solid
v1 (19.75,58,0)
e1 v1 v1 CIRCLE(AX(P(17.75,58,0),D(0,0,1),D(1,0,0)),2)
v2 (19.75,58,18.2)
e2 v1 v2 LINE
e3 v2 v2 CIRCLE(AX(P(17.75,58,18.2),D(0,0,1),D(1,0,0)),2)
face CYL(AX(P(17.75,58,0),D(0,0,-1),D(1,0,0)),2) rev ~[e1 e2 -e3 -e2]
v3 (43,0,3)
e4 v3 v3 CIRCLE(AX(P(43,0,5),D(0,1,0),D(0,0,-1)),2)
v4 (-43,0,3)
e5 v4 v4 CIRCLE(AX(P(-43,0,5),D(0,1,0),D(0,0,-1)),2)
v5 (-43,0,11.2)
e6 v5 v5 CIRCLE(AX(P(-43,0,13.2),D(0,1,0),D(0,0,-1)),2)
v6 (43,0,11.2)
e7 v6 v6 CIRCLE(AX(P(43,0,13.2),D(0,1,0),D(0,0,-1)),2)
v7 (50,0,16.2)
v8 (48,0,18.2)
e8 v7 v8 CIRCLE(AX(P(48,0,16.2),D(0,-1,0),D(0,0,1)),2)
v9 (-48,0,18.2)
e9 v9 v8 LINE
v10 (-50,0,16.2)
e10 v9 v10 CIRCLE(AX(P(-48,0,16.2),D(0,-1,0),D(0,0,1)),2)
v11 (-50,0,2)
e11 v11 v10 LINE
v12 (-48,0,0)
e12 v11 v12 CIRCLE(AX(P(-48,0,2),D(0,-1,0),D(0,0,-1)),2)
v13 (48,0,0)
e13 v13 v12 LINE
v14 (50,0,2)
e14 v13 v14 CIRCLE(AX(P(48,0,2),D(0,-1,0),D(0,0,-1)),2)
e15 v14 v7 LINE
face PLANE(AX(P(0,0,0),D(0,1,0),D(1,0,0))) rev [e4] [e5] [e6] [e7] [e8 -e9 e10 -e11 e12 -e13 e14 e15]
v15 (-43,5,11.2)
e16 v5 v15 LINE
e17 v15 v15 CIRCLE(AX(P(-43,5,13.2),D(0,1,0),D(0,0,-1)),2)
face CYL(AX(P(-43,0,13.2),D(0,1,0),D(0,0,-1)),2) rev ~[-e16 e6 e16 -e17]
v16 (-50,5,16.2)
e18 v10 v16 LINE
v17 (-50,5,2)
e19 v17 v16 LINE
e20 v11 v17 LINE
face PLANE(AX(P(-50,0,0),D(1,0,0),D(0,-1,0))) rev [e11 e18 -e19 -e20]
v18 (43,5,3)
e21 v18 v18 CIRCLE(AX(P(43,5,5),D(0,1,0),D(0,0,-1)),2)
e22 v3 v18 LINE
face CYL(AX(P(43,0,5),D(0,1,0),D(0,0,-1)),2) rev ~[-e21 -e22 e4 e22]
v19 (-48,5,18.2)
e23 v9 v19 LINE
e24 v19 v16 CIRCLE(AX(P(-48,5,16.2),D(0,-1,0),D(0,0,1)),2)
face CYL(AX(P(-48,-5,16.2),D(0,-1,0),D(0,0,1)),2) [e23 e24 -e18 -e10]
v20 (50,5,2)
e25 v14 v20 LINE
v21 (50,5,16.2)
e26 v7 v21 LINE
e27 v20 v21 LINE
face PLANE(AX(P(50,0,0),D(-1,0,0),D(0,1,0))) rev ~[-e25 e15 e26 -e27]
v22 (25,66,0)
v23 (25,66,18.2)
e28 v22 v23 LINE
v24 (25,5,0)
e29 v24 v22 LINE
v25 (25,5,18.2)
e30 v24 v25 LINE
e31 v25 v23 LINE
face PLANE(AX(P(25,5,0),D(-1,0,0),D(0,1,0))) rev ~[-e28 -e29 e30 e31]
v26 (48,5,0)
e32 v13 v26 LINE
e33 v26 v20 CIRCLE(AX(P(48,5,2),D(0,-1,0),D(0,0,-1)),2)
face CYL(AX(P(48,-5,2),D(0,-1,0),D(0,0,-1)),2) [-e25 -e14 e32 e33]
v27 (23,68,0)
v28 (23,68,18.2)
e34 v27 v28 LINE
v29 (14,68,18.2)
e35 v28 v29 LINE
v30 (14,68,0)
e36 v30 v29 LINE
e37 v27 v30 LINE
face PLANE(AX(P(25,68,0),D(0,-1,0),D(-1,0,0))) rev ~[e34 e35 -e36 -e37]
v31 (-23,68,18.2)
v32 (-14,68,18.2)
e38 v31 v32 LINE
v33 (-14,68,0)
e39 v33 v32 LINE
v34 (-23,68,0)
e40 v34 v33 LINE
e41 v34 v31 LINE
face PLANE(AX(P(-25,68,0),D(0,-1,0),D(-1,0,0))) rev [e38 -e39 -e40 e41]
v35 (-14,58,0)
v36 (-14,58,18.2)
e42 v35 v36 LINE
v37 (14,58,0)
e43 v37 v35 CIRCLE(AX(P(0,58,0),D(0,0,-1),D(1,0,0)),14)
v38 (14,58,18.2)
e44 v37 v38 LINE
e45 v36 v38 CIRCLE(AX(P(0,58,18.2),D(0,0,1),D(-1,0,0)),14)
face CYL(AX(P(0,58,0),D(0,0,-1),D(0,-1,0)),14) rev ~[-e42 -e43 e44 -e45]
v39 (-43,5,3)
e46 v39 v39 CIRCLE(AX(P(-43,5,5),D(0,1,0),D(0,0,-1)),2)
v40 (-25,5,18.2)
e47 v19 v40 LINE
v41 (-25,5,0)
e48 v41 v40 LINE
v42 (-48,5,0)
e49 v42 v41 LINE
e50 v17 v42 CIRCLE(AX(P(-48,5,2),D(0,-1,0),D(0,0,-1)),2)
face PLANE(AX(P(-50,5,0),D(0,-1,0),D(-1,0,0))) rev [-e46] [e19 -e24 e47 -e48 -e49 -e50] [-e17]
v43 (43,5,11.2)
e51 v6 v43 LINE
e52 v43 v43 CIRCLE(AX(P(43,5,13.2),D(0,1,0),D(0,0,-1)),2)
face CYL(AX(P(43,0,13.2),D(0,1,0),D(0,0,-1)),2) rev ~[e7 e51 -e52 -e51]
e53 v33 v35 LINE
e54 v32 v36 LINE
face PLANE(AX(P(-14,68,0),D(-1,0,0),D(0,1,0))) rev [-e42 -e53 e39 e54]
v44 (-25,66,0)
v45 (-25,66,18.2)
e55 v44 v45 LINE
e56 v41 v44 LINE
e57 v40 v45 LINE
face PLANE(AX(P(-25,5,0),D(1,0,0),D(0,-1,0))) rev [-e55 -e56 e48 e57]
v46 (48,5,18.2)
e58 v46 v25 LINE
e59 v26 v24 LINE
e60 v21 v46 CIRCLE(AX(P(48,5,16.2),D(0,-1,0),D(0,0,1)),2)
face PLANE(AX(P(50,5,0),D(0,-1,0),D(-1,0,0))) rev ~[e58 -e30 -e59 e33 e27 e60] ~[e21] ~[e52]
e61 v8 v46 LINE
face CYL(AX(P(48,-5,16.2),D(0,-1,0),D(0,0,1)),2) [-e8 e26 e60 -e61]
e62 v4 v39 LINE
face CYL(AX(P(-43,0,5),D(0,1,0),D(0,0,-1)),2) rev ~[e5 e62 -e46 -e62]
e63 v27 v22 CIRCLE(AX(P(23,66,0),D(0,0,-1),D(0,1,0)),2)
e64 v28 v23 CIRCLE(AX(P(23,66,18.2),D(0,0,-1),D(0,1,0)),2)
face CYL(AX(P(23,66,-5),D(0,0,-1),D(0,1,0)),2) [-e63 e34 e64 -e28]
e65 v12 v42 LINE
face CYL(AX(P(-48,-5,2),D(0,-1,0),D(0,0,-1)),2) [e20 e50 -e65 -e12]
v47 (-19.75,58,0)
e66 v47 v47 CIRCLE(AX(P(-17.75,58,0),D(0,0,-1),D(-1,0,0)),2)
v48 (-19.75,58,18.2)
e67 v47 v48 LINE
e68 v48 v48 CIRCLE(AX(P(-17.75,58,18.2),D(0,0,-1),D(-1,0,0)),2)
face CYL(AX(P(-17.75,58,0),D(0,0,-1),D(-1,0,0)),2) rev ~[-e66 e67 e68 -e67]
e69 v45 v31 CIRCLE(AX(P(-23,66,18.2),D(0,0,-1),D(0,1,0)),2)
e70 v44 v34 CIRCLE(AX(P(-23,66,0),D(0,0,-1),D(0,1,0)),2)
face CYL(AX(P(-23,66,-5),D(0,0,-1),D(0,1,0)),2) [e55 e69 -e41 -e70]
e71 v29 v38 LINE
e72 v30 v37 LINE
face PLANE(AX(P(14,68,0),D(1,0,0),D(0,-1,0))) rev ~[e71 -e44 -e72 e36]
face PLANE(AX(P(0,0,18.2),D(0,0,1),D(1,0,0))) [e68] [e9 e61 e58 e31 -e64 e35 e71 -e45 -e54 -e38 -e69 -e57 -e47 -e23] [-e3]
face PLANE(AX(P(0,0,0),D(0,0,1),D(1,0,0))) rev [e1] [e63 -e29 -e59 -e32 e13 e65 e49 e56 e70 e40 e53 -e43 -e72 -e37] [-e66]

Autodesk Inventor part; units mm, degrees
ref_plane "YZ Plane" through (0, 0, 0) normal (1, 0, 0) x (0, 1, 0)
ref_plane "XZ Plane" through (0, 0, 0) normal (0, 1, 0) x (-1, 0, 0)
ref_plane "XY Plane" through (0, 0, 0) normal (0, 0, 1) x (1, 0, 0)
sketch "Sketch1" plane through (0, 0, 0) normal (0, 0, 1) x (1, 0, 0)
  line L0 (0, 65.5357) -> (0, 44) construction
  line L1 (0, 0) -> (50, 0)
  line L2 (50, 0) -> (50, 5)
  line L3 (50, 5) -> (25, 5)
  line L4 (25, 5) -> (25, 68)
  line L5 (25, 68) -> (14, 68)
  line L6 (14, 68) -> (14, 58)
  arc A0 (0, 44) -> (14, 58) centre (0, 58) ccw
  circle A1 centre (17.75, 58) radius 2
  line L7 (0, 44) -> (0, 0)
  point P0 (0, 50)
  dimension "d0" = 5
  dimension "d1" = 50
  dimension "d2" = 25
  dimension "d4" = 14
  dimension "d5" = 4
  dimension "d6" = 17.75
  dimension "d7" = 10
  dimension "d22" = 50
  dimension "d23" = 6
extrude "Extrusion1" add sketch "Sketch1" along normal blind 18.2
mirror "Mirror1" about plane through (0, 0, 0) normal (1, 0, 0) of "Extrusion1"
sketch "Sketch2" plane through (50, 0, 0) normal (0, -1, 0) x (1, 0, 0)
  line L0 (-75, 0) -> (-75, 18.2) projected
  line L1 (-25, 0) -> (-25, 18.2) projected
  line L2 (-100, 0) -> (-100, 18.2) projected
  line L3 (0, 0) -> (0, 18.2) projected
  line L4 (0, 18.2) -> (-100, 18.2) projected
  line L5 (-100, 0) -> (0, 0) projected
  point P0 (-50, 0)
  point P1 (-93, 13.2)
  point P2 (-93, 5)
  point P3 (-7, 5)
  point P4 (-7, 13.2)
  dimension "d10" = 7
  dimension "d11" = 7
  dimension "d12" = 5
  dimension "d13" = 5
hole "Hole1" at (-43, 0, 13.2) at (-43, 0, 5) at (43, 0, 5) at (43, 0, 13.2) direction (0, 1, 0) diameter 4 end through all
fillet "Fillet1" radius 2 6 edges at (-50, 2.5, 18.2) (-50, 2.5, 0) (50, 2.5, 0) (50, 2.5, 18.2) (25, 68, 9.1) (-25, 68, 9.1)
properties part number "STEPPER MOTOR MOUNT"
